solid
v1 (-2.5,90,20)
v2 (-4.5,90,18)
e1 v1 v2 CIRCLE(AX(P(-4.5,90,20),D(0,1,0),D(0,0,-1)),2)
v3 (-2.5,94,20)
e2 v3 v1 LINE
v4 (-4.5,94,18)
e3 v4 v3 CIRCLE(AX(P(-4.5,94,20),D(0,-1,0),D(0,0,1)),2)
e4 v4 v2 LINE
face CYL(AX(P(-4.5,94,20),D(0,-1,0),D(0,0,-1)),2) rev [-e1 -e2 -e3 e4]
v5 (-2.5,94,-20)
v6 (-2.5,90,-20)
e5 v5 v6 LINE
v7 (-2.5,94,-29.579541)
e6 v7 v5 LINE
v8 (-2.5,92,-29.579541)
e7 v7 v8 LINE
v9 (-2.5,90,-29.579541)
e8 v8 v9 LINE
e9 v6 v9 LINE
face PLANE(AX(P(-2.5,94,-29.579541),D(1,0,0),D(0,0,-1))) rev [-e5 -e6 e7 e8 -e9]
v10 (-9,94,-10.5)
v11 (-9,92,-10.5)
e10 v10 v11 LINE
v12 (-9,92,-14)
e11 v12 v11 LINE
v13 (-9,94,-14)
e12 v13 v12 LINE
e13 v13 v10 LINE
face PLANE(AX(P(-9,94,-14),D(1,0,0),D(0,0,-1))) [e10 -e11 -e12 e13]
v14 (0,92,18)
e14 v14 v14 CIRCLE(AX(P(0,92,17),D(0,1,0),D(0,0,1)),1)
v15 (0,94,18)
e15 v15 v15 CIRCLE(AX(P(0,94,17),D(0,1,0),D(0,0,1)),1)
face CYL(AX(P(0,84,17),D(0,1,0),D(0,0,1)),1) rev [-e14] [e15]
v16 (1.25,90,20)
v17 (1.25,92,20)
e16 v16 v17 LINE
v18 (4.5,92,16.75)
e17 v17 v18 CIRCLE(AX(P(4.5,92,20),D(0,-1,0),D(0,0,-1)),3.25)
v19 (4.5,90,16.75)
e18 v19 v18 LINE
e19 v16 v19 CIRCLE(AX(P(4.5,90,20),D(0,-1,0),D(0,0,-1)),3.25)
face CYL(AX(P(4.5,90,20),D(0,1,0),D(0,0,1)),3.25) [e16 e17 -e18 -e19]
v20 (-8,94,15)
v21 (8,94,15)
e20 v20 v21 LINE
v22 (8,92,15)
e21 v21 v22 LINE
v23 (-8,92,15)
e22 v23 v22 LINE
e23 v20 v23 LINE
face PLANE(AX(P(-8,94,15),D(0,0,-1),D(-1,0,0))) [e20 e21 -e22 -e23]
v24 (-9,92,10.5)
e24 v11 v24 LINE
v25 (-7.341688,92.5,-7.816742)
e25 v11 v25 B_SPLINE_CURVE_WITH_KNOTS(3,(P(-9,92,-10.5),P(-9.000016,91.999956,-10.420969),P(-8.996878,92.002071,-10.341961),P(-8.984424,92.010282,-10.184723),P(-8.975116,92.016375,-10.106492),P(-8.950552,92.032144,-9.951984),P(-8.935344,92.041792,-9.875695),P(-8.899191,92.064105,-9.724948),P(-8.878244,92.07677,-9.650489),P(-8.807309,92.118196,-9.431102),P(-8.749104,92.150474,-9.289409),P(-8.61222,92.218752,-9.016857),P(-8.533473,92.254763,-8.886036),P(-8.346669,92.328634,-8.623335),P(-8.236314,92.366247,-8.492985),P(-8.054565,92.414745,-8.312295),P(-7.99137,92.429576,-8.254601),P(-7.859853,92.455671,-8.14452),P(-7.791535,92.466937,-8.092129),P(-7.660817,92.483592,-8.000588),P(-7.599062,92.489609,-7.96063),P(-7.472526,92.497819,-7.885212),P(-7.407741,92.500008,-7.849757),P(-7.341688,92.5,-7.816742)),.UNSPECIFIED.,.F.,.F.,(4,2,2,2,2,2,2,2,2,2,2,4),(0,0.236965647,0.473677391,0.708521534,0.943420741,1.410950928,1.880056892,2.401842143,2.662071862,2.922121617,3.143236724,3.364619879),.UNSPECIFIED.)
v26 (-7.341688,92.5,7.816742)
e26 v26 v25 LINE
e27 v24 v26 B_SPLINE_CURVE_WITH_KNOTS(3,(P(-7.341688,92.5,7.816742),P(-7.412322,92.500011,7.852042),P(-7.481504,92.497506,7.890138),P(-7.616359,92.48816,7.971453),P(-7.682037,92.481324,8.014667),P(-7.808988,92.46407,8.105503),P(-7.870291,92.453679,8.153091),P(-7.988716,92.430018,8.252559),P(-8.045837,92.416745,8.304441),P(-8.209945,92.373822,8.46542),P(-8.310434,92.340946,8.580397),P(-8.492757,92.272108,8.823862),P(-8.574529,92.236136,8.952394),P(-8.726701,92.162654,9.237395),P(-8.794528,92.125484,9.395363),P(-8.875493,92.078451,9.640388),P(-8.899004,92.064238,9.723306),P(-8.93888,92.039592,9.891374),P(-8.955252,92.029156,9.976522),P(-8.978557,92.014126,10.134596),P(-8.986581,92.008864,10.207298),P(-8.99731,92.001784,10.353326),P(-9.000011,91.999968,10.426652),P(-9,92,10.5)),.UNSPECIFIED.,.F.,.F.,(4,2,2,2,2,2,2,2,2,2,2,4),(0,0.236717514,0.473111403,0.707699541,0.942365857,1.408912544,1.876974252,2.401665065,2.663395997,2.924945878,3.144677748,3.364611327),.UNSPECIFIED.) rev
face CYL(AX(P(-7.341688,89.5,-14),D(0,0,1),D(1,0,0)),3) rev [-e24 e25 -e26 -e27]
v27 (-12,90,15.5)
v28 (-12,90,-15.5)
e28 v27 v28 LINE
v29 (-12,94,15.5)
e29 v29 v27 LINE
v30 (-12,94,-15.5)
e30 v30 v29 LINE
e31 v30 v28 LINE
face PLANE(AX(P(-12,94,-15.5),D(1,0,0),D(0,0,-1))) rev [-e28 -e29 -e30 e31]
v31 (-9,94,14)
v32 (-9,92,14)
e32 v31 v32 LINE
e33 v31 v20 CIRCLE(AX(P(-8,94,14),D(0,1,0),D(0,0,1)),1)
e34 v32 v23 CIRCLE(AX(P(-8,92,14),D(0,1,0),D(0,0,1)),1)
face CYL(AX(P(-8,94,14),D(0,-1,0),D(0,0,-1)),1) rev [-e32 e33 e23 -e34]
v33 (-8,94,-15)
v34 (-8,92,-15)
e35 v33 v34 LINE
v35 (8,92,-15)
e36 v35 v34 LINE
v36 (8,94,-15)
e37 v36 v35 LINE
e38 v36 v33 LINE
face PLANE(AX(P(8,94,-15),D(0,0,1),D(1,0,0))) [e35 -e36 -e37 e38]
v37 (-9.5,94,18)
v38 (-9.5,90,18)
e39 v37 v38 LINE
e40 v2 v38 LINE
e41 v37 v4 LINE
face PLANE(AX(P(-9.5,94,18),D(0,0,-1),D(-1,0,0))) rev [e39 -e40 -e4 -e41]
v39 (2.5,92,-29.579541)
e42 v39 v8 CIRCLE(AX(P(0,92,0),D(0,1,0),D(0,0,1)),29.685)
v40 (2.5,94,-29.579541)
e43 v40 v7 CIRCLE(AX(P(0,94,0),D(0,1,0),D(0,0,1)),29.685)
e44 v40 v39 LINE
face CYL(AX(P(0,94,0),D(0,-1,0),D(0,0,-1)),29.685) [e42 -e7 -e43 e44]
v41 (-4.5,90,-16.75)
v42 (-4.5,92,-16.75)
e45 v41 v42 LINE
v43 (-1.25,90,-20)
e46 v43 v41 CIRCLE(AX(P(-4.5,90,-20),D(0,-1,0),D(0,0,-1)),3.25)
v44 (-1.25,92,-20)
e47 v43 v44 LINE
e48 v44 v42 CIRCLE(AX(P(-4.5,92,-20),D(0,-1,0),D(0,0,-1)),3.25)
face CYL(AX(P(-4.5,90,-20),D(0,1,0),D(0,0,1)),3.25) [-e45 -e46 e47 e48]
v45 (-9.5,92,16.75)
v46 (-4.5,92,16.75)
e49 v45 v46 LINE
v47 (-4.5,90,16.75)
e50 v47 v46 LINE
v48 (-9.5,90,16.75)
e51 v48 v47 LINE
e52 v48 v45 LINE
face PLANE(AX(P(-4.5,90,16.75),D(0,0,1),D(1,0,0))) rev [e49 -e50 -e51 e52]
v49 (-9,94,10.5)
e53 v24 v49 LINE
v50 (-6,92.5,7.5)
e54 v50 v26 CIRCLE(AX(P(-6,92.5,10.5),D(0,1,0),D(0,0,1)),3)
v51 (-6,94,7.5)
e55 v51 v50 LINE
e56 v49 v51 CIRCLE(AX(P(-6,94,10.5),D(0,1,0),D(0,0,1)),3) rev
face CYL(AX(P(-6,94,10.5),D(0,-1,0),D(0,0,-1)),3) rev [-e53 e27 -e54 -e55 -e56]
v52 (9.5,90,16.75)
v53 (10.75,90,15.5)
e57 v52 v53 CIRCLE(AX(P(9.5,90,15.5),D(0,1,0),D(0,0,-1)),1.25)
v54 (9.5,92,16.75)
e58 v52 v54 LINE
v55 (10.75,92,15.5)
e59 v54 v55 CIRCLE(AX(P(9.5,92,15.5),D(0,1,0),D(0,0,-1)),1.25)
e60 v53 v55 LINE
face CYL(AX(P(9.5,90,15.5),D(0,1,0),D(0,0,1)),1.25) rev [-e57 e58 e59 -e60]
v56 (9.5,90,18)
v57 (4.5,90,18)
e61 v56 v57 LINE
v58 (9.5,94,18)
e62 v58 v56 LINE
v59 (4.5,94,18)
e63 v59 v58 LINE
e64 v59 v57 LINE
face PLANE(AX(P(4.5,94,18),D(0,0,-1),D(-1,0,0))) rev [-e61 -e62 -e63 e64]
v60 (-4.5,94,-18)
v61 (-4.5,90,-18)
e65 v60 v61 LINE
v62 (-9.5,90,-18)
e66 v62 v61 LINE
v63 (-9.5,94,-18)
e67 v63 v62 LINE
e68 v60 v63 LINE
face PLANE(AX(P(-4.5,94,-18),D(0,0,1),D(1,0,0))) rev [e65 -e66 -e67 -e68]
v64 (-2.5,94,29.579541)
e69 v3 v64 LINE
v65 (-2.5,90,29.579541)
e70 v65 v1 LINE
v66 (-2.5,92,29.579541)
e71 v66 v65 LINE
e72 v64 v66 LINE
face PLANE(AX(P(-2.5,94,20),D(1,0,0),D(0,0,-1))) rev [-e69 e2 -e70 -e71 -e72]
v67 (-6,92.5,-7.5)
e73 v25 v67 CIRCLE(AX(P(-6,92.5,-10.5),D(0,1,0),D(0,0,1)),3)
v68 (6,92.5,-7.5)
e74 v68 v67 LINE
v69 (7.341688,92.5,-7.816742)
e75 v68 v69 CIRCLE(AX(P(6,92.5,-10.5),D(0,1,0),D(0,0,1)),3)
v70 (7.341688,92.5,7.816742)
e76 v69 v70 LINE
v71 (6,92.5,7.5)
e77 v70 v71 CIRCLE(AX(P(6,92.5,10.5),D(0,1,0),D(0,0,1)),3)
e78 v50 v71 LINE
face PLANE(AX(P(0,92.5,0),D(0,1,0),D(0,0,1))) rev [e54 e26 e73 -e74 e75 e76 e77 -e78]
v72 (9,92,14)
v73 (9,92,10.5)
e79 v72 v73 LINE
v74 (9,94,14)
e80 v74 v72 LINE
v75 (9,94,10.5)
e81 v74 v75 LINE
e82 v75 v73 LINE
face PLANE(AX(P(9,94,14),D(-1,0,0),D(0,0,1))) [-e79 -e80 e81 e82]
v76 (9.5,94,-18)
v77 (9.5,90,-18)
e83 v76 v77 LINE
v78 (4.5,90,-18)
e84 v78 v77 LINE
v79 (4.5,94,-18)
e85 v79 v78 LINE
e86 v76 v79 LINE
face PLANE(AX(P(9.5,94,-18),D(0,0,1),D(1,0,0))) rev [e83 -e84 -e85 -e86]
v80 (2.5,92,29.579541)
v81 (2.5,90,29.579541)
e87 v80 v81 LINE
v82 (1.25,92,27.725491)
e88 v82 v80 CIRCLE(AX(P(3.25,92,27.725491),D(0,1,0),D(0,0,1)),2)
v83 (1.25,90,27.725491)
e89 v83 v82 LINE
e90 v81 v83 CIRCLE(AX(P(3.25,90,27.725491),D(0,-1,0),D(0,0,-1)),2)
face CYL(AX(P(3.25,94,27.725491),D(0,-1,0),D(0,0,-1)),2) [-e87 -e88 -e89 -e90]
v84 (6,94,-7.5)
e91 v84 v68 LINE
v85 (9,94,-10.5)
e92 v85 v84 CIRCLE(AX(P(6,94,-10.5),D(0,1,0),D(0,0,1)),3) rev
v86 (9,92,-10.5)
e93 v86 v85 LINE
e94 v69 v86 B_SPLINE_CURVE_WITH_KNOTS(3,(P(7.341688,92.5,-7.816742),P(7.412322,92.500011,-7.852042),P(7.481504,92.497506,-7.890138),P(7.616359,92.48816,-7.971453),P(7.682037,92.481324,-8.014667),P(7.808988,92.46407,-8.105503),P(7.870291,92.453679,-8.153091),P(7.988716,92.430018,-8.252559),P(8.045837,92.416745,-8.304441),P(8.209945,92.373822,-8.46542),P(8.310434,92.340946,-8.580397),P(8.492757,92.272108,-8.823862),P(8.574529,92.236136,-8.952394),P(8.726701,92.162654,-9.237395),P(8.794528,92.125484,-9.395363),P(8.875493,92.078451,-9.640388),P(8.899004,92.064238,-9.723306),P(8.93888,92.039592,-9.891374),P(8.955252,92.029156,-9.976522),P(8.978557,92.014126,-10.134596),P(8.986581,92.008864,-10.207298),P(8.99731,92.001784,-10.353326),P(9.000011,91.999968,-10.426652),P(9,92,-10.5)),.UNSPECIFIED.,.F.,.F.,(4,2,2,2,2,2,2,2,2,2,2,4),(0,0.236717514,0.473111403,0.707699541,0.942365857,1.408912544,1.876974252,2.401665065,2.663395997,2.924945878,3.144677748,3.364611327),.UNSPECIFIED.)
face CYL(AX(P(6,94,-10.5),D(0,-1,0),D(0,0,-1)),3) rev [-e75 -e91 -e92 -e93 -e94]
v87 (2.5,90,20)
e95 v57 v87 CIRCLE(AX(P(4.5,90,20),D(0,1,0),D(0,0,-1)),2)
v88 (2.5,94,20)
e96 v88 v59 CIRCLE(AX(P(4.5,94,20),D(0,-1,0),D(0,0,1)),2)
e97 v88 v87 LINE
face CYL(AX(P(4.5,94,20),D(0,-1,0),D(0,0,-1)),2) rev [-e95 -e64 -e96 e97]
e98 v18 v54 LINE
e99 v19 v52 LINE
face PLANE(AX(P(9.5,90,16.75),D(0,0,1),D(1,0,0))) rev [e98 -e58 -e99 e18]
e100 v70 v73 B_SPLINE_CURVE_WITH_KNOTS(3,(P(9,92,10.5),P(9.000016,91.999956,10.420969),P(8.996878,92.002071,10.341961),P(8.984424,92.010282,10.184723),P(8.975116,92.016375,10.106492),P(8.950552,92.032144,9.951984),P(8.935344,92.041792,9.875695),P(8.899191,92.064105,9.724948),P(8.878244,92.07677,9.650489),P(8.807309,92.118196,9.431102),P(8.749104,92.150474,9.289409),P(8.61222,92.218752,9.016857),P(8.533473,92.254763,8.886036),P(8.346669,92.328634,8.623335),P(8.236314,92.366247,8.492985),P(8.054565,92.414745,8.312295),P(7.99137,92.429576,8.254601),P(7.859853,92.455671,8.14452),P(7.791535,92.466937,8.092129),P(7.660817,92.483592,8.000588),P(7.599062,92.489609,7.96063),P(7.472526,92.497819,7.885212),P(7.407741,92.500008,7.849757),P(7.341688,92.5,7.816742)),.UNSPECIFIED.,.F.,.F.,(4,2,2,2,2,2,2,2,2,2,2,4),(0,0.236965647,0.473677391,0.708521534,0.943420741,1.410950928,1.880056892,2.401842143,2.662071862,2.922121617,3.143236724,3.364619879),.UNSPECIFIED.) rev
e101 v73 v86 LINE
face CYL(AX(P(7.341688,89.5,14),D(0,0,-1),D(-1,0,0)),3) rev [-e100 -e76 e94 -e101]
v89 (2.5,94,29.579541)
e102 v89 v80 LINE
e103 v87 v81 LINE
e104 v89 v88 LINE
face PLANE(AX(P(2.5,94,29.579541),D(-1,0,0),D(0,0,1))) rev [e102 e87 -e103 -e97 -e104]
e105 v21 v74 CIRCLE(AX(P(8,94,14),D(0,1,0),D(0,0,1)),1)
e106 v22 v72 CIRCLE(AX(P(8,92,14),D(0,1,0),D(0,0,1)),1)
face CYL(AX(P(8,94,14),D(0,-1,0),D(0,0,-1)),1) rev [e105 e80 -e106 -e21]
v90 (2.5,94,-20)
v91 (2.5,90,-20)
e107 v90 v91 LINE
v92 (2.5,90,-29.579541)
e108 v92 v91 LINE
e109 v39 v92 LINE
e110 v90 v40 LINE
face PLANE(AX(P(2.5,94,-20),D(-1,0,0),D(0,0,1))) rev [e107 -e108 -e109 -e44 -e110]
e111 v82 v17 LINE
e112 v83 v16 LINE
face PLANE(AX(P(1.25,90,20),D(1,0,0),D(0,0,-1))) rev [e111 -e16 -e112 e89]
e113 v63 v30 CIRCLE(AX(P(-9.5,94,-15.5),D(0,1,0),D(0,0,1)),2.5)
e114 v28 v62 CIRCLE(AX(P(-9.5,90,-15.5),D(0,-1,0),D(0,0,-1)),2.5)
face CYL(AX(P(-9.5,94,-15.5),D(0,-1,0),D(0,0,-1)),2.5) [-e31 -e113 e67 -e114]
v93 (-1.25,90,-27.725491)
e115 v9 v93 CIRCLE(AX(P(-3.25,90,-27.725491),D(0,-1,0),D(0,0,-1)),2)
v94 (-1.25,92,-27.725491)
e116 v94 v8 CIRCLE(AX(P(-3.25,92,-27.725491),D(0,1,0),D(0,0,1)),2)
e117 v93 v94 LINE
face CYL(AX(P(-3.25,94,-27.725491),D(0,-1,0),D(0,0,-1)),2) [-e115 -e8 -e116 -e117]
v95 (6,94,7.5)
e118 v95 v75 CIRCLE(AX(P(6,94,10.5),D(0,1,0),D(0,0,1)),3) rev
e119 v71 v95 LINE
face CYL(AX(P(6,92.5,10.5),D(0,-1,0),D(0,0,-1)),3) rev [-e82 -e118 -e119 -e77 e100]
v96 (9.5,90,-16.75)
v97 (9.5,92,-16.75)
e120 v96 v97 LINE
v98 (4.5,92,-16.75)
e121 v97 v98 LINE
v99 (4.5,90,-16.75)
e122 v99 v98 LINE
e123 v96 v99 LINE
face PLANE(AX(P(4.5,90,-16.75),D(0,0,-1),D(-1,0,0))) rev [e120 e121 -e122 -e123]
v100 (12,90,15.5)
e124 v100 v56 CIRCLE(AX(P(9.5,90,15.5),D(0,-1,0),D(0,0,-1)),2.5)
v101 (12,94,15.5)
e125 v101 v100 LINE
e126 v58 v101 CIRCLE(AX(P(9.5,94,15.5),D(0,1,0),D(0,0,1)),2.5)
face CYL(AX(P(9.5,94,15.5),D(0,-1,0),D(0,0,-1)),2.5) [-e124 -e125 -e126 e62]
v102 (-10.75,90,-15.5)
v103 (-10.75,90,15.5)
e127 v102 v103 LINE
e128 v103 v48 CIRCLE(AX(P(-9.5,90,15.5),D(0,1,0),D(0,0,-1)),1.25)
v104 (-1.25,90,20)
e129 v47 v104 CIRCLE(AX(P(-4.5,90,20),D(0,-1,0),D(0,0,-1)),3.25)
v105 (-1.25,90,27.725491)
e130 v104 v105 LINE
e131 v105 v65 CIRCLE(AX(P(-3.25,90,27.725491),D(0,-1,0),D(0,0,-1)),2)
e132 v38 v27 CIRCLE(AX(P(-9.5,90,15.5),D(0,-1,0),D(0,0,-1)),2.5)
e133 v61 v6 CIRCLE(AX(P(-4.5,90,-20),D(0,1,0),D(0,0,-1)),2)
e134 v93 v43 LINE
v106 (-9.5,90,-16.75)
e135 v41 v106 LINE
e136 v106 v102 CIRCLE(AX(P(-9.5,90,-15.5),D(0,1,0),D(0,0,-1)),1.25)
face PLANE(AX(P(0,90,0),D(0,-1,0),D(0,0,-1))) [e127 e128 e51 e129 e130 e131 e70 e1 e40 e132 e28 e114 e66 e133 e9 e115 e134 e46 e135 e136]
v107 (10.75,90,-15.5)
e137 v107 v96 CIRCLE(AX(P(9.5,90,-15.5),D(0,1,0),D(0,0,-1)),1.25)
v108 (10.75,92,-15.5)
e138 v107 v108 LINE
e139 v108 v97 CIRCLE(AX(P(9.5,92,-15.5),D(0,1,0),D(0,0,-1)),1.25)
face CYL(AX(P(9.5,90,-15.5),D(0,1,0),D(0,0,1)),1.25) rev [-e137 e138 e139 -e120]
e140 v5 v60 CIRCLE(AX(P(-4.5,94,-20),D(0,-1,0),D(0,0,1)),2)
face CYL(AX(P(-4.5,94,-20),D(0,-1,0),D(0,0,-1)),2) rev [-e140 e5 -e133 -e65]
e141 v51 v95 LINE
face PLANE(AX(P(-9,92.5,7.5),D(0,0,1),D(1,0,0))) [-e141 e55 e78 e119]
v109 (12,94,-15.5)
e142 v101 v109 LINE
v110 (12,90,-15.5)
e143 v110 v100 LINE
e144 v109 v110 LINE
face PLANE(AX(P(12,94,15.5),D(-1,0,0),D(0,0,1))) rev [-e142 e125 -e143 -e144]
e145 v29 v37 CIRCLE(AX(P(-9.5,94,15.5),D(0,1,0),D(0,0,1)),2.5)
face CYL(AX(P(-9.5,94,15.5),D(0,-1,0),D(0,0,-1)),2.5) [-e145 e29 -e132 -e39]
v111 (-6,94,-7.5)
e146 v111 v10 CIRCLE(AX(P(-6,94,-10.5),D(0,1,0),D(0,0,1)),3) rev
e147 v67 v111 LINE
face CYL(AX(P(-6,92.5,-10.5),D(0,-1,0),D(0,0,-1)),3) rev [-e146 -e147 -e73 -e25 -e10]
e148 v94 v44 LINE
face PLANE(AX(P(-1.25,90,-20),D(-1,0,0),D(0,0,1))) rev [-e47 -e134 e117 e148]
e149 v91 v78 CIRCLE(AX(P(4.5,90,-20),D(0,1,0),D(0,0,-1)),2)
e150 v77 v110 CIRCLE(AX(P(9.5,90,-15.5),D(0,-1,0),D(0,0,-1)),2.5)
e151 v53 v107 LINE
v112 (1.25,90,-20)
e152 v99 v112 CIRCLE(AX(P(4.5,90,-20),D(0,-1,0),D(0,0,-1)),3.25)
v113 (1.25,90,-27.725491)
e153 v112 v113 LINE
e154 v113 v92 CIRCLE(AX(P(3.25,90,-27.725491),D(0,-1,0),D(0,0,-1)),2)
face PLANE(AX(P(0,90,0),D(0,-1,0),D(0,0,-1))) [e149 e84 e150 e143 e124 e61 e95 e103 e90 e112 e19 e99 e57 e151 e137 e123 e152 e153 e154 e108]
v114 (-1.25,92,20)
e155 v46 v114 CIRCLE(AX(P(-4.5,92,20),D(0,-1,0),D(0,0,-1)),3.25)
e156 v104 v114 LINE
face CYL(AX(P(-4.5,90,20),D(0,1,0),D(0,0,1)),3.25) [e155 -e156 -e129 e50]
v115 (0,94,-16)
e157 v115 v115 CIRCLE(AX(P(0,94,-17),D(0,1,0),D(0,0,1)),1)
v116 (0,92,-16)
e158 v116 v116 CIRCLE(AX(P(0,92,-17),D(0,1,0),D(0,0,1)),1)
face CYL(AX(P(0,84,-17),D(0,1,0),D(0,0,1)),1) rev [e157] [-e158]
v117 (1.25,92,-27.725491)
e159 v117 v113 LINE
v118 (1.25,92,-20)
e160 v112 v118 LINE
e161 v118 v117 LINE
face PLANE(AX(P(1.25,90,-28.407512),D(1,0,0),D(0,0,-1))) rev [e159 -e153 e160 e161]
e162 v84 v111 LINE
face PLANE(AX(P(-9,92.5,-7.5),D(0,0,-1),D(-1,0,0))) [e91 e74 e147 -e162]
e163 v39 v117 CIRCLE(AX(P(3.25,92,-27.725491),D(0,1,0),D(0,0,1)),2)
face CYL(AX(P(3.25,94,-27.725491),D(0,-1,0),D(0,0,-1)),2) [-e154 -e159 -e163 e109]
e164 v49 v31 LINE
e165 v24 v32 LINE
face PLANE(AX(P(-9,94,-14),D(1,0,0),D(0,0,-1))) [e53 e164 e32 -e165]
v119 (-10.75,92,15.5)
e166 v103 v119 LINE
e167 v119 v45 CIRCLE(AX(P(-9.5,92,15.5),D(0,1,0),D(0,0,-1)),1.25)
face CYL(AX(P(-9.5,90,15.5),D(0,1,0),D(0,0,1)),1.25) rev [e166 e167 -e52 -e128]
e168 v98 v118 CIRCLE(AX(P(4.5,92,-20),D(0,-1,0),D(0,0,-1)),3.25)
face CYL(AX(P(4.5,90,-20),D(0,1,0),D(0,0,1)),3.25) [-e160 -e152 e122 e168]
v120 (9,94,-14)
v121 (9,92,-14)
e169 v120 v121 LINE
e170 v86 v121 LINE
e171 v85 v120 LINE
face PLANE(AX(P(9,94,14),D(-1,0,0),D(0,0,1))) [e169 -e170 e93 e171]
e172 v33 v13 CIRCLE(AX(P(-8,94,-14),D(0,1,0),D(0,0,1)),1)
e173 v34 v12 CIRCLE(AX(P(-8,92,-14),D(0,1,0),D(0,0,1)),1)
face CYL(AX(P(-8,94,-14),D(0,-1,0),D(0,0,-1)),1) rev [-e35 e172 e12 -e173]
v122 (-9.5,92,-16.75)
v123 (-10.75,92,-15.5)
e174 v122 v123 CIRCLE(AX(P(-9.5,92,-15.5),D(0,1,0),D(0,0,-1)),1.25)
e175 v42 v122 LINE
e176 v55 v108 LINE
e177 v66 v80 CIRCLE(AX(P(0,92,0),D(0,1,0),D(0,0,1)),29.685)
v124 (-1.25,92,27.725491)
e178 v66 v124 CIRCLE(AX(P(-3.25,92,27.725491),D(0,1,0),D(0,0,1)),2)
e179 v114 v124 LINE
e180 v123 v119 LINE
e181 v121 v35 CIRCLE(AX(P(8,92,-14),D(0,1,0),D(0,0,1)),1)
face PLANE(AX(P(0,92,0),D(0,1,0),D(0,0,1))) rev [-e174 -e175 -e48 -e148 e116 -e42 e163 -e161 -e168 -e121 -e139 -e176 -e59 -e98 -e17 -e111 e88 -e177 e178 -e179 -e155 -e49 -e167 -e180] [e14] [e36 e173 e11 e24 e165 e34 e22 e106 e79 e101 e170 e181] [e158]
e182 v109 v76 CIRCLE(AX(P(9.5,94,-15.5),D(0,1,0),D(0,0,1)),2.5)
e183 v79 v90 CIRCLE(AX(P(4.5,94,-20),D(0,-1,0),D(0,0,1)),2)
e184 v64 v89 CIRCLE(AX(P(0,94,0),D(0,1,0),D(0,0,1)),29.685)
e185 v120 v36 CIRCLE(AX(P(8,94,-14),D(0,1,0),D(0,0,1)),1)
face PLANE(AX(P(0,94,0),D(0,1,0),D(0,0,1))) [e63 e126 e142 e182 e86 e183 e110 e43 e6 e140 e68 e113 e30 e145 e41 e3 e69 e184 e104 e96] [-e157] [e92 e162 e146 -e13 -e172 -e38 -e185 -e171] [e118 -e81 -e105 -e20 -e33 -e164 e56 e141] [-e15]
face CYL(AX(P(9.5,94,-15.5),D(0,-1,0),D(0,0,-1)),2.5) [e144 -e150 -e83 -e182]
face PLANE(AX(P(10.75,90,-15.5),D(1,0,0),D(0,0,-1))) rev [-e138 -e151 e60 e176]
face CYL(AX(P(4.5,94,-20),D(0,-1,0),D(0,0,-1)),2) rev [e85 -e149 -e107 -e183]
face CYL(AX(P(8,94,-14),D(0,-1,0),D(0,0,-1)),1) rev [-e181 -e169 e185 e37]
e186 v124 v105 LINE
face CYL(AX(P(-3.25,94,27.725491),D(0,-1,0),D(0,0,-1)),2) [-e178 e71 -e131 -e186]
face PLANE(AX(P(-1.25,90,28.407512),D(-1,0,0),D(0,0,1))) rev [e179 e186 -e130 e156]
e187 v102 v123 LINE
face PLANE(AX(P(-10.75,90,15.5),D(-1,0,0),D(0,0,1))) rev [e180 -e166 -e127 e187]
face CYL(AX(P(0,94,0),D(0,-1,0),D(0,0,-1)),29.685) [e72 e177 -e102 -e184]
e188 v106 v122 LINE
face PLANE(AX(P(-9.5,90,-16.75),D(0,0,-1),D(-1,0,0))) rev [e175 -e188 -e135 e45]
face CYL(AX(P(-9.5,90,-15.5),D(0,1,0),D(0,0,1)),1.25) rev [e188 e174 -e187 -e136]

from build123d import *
from build123d.topology import SkipClean

# Parameters (mm, degrees)
BATTERY_HOLDER_OUTLINE_DEPTH        = 2
LIP_START                           = 2
LIP_DEPTH                           = 2
SKETCH4_R                           = 1
SCREWHOLE_DEPTH                     = 10
SKETCH5_W                           = 18
SKETCH5_H                           = 15
ACTUAL_BATTERY_CAP_THINGY_DEPTH     = 1.5
FILLETS_START                       = 91.999999219
FILLETS_FOR_THE_THING_ABOVE_DEPTH   = 2.000000781
FILLETS_START_2                     = -12
FILLETS_FOR_THE_THING_ABOVE_2_DEPTH = 23
FILLETS_AT_EDGE_R                   = 2


with BuildPart() as part:
    # Sketch2 → Battery holder outline (new body)
    with BuildSketch(Plane(origin=(0, 92, 0), x_dir=(1, 0, 0), z_dir=(0, 1, 0))):
        with BuildLine():
            Line((-9.5, -18), (-4.5, -18))
            ThreePointArc((-4.5, -18), (-3.085786438, -18.585786438), (-2.5, -20))
            Line((-2.5, -20), (-2.5, -29.579540649))
            ThreePointArc((-2.5, -29.579540649), (0, -29.685), (2.5, -29.579540649))
            Line((2.5, -29.579540649), (2.5, -20))
            ThreePointArc((2.5, -20), (3.085786438, -18.585786438), (4.5, -18))
            Line((4.5, -18), (9.5, -18))
            ThreePointArc((9.5, -18), (11.267766953, -17.267766953), (12, -15.5))
            Line((12, -15.5), (12, 15.5))
            ThreePointArc((12, 15.5), (11.267766953, 17.267766953), (9.5, 18))
            Line((9.5, 18), (4.5, 18))
            ThreePointArc((4.5, 18), (3.085786438, 18.585786438), (2.5, 20))
            Line((2.5, 20), (2.5, 29.579540649))
            ThreePointArc((2.5, 29.579540649), (0, 29.685), (-2.5, 29.579540649))
            Line((-2.5, 29.579540649), (-2.5, 20))
            ThreePointArc((-2.5, 20), (-3.085786438, 18.585786438), (-4.5, 18))
            Line((-4.5, 18), (-9.5, 18))
            ThreePointArc((-9.5, 18), (-11.267766953, 17.267766953), (-12, 15.5))
            Line((-12, 15.5), (-12, -15.5))
            ThreePointArc((-12, -15.5), (-11.267766953, -17.267766953), (-9.5, -18))
        make_face()
        with BuildLine():
            Line((8, 15), (-8, 15))
            ThreePointArc((-8, 15), (-8.707106781, 14.707106781), (-9, 14))
            Line((-9, 14), (-9, -14))
            ThreePointArc((-9, -14), (-8.707106781, -14.707106781), (-8, -15))
            Line((-8, -15), (8, -15))
            ThreePointArc((8, -15), (8.707106781, -14.707106781), (9, -14))
            Line((9, -14), (9, 14))
            ThreePointArc((9, 14), (8.707106781, 14.707106781), (8, 15))
        make_face(mode=Mode.SUBTRACT)
    extrude(amount=BATTERY_HOLDER_OUTLINE_DEPTH)

    # Sketch3 → Lip (add)
    with SkipClean():  # the faces are left unmerged after this step: merging them gives an invalid solid
        with BuildSketch(Plane.XZ.offset(-92).offset(LIP_START)):
            with BuildLine():
                Line((2.5, 20), (2.5, 29.579540649))
                ThreePointArc((2.5, 29.579540649), (1.875417387, 29.625698888), (1.25, 29.658670317))
                Line((1.25, 29.658670317), (1.25, 28.407511771))
                Line((1.25, 28.407511771), (1.25, 20))
                ThreePointArc((1.25, 20), (2.201902961, 17.701902961), (4.5, 16.75))
                Line((4.5, 16.75), (9.5, 16.75))
                ThreePointArc((9.5, 16.75), (10.383883476, 16.383883476), (10.75, 15.5))
                Line((10.75, 15.5), (10.75, -15.5))
                ThreePointArc((10.75, -15.5), (10.383883476, -16.383883476), (9.5, -16.75))
                Line((9.5, -16.75), (4.5, -16.75))
                ThreePointArc((4.5, -16.75), (2.201902961, -17.701902961), (1.25, -20))
                Line((1.25, -20), (1.25, -28.407511771))
                Line((1.25, -28.407511771), (1.25, -29.658670317))
                ThreePointArc((1.25, -29.658670317), (1.875417387, -29.625698888), (2.5, -29.579540649))
                Line((2.5, -29.579540649), (2.5, -20))
                ThreePointArc((2.5, -20), (3.085786438, -18.585786438), (4.5, -18))
                Line((4.5, -18), (9.5, -18))
                ThreePointArc((9.5, -18), (11.267766953, -17.267766953), (12, -15.5))
                Line((12, -15.5), (12, 15.5))
                ThreePointArc((12, 15.5), (11.267766953, 17.267766953), (9.5, 18))
                Line((9.5, 18), (4.5, 18))
                ThreePointArc((4.5, 18), (3.085786438, 18.585786438), (2.5, 20))
            make_face()
            with BuildLine():
                Line((-2.5, -20), (-2.5, -29.579540649))
                ThreePointArc((-2.5, -29.579540649), (-1.875417387, -29.625698888), (-1.25, -29.658670317))
                Line((-1.25, -29.658670317), (-1.25, -28.407511771))
                Line((-1.25, -28.407511771), (-1.25, -20))
                ThreePointArc((-1.25, -20), (-2.201902961, -17.701902961), (-4.5, -16.75))
                Line((-4.5, -16.75), (-9.5, -16.75))
                ThreePointArc((-9.5, -16.75), (-10.383883476, -16.383883476), (-10.75, -15.5))
                Line((-10.75, -15.5), (-10.75, 15.5))
                ThreePointArc((-10.75, 15.5), (-10.383883476, 16.383883476), (-9.5, 16.75))
                Line((-9.5, 16.75), (-4.5, 16.75))
                ThreePointArc((-4.5, 16.75), (-2.201902961, 17.701902961), (-1.25, 20))
                Line((-1.25, 20), (-1.25, 28.407511771))
                Line((-1.25, 28.407511771), (-1.25, 29.658670317))
                ThreePointArc((-1.25, 29.658670317), (-1.875417387, 29.625698888), (-2.5, 29.579540649))
                Line((-2.5, 29.579540649), (-2.5, 20))
                ThreePointArc((-2.5, 20), (-3.085786438, 18.585786438), (-4.5, 18))
                Line((-4.5, 18), (-9.5, 18))
                ThreePointArc((-9.5, 18), (-11.267766953, 17.267766953), (-12, 15.5))
                Line((-12, 15.5), (-12, -15.5))
                ThreePointArc((-12, -15.5), (-11.267766953, -17.267766953), (-9.5, -18))
                Line((-9.5, -18), (-4.5, -18))
                ThreePointArc((-4.5, -18), (-3.085786438, -18.585786438), (-2.5, -20))
            make_face()
        extrude(amount=-LIP_DEPTH)

    # Sketch4 → Screwhole (cut)
    with SkipClean():  # the faces are left unmerged after this step: merging them gives an invalid solid
        with BuildSketch(Plane(origin=(0, 94, 0), x_dir=(1, 0, 0), z_dir=(0, 1, 0))):
            with Locations(Location((0, 17, 0), (0, 0, 270))):
                Circle(SKETCH4_R)
            with Locations(Location((0, -17, 0), (0, 0, 270))):
                Circle(SKETCH4_R)
        extrude(amount=-SCREWHOLE_DEPTH, mode=Mode.SUBTRACT)

    # Sketch5 → Actual battery cap thingy (add)
    with SkipClean():  # the faces are left unmerged after this step: merging them gives an invalid solid
        with BuildSketch(Plane(origin=(0, 94, 0), x_dir=(1, 0, 0), z_dir=(0, 1, 0))):
            Rectangle(SKETCH5_W, SKETCH5_H)
        extrude(amount=-ACTUAL_BATTERY_CAP_THINGY_DEPTH)

    # Fillets for the thing above: read off the stored shape, not the designer's step
    # Fillets for the thing above outline → Fillets for the thing above (add)
    with SkipClean():  # the faces are left unmerged after this step: merging them gives an invalid solid
        with BuildSketch(Plane(origin=(0, 0, 0), x_dir=(1, 0, 0), z_dir=(0, 1, 0)).offset(FILLETS_START)):
            with BuildLine():
                ThreePointArc((9, 10.5), (8.121320344, 8.378679656), (6, 7.5))
                Line((6, 7.5), (-6, 7.5))
                ThreePointArc((-6, 7.5), (-8.121320344, 8.378679656), (-9, 10.5))
                Line((-9, 10.5), (-9, -10.5))
                ThreePointArc((-9, -10.5), (-8.121320344, -8.378679656), (-6, -7.5))
                Line((-6, -7.5), (6, -7.5))
                ThreePointArc((6, -7.5), (8.121320344, -8.378679656), (9, -10.5))
                Line((9, -10.5), (9, 10.5))
            make_face()
        extrude(amount=FILLETS_FOR_THE_THING_ABOVE_DEPTH)

    # Fillets for the thing above 2 outline → Fillets for the thing above 2 (cut)
    with SkipClean():  # the faces are left unmerged after this step: merging them gives an invalid solid
        with BuildSketch(Plane.XY.offset(FILLETS_START_2)):
            with BuildLine():
                ThreePointArc((9.000010237, 91.99999321), (8.207718889, 92.37227955), (7.341687605, 92.5))
                Line((7.341687605, 92.5), (-7.341687605, 92.5))
                ThreePointArc((-7.341687605, 92.5), (-8.207718889, 92.37227955), (-9.000010237, 91.99999321))
                Line((-9.000010237, 91.99999321), (9.000010237, 91.99999321))
            make_face()
        extrude(amount=FILLETS_FOR_THE_THING_ABOVE_2_DEPTH, mode=Mode.SUBTRACT)

    # Fillets at edge
    # the kernel refuses this fillet: 2 mm, written as the material it takes off along each edge
    with BuildSketch(Plane(origin=(-1.25, 85.167051774, -29.658670317), x_dir=(-0.9980023206455083, 0, 0.06317727428577244), z_dir=(0, 1, 0)), Plane(origin=(1.25, 85.167051774, 29.658670317), x_dir=(0.9980023206455083, 0, -0.06317727428577508), z_dir=(0, 1, 0))) as fillets_at_edge_piece_1:
        with BuildLine():
            CenterArc((2.11813764, 1.802962869), FILLETS_AT_EDGE_R, 176.377796501, 67.975687163)
            Line((0.122132998, 1.929317418), (0, 0))
            ThreePointArc((0, 0), (0.626251049, -0.006606603), (1.252502098, 0))
        make_face()
    extrude(amount=6.832948226, mode=Mode.SUBTRACT)
    with BuildSketch(Plane(origin=(1.25, 85.167051774, -29.658670317), x_dir=(0.998002320645508, 0, 0.06317727428577799), z_dir=(0, 1, 0)), Plane(origin=(-1.25, 85.167051774, 29.658670317), x_dir=(-0.998002320645508, 0, -0.06317727428577828), z_dir=(0, 1, 0))) as fillets_at_edge_piece_2:
        with BuildLine():
            CenterArc((2.11813764, -1.802962869), FILLETS_AT_EDGE_R, 115.646516337, 67.975687163)
            Line((0.122132998, -1.929317418), (0, 0))
            ThreePointArc((0, 0), (0.626251049, 0.006606603), (1.252502098, 0))
        make_face()
    extrude(amount=6.832948226, mode=Mode.SUBTRACT)


solid = part.part
